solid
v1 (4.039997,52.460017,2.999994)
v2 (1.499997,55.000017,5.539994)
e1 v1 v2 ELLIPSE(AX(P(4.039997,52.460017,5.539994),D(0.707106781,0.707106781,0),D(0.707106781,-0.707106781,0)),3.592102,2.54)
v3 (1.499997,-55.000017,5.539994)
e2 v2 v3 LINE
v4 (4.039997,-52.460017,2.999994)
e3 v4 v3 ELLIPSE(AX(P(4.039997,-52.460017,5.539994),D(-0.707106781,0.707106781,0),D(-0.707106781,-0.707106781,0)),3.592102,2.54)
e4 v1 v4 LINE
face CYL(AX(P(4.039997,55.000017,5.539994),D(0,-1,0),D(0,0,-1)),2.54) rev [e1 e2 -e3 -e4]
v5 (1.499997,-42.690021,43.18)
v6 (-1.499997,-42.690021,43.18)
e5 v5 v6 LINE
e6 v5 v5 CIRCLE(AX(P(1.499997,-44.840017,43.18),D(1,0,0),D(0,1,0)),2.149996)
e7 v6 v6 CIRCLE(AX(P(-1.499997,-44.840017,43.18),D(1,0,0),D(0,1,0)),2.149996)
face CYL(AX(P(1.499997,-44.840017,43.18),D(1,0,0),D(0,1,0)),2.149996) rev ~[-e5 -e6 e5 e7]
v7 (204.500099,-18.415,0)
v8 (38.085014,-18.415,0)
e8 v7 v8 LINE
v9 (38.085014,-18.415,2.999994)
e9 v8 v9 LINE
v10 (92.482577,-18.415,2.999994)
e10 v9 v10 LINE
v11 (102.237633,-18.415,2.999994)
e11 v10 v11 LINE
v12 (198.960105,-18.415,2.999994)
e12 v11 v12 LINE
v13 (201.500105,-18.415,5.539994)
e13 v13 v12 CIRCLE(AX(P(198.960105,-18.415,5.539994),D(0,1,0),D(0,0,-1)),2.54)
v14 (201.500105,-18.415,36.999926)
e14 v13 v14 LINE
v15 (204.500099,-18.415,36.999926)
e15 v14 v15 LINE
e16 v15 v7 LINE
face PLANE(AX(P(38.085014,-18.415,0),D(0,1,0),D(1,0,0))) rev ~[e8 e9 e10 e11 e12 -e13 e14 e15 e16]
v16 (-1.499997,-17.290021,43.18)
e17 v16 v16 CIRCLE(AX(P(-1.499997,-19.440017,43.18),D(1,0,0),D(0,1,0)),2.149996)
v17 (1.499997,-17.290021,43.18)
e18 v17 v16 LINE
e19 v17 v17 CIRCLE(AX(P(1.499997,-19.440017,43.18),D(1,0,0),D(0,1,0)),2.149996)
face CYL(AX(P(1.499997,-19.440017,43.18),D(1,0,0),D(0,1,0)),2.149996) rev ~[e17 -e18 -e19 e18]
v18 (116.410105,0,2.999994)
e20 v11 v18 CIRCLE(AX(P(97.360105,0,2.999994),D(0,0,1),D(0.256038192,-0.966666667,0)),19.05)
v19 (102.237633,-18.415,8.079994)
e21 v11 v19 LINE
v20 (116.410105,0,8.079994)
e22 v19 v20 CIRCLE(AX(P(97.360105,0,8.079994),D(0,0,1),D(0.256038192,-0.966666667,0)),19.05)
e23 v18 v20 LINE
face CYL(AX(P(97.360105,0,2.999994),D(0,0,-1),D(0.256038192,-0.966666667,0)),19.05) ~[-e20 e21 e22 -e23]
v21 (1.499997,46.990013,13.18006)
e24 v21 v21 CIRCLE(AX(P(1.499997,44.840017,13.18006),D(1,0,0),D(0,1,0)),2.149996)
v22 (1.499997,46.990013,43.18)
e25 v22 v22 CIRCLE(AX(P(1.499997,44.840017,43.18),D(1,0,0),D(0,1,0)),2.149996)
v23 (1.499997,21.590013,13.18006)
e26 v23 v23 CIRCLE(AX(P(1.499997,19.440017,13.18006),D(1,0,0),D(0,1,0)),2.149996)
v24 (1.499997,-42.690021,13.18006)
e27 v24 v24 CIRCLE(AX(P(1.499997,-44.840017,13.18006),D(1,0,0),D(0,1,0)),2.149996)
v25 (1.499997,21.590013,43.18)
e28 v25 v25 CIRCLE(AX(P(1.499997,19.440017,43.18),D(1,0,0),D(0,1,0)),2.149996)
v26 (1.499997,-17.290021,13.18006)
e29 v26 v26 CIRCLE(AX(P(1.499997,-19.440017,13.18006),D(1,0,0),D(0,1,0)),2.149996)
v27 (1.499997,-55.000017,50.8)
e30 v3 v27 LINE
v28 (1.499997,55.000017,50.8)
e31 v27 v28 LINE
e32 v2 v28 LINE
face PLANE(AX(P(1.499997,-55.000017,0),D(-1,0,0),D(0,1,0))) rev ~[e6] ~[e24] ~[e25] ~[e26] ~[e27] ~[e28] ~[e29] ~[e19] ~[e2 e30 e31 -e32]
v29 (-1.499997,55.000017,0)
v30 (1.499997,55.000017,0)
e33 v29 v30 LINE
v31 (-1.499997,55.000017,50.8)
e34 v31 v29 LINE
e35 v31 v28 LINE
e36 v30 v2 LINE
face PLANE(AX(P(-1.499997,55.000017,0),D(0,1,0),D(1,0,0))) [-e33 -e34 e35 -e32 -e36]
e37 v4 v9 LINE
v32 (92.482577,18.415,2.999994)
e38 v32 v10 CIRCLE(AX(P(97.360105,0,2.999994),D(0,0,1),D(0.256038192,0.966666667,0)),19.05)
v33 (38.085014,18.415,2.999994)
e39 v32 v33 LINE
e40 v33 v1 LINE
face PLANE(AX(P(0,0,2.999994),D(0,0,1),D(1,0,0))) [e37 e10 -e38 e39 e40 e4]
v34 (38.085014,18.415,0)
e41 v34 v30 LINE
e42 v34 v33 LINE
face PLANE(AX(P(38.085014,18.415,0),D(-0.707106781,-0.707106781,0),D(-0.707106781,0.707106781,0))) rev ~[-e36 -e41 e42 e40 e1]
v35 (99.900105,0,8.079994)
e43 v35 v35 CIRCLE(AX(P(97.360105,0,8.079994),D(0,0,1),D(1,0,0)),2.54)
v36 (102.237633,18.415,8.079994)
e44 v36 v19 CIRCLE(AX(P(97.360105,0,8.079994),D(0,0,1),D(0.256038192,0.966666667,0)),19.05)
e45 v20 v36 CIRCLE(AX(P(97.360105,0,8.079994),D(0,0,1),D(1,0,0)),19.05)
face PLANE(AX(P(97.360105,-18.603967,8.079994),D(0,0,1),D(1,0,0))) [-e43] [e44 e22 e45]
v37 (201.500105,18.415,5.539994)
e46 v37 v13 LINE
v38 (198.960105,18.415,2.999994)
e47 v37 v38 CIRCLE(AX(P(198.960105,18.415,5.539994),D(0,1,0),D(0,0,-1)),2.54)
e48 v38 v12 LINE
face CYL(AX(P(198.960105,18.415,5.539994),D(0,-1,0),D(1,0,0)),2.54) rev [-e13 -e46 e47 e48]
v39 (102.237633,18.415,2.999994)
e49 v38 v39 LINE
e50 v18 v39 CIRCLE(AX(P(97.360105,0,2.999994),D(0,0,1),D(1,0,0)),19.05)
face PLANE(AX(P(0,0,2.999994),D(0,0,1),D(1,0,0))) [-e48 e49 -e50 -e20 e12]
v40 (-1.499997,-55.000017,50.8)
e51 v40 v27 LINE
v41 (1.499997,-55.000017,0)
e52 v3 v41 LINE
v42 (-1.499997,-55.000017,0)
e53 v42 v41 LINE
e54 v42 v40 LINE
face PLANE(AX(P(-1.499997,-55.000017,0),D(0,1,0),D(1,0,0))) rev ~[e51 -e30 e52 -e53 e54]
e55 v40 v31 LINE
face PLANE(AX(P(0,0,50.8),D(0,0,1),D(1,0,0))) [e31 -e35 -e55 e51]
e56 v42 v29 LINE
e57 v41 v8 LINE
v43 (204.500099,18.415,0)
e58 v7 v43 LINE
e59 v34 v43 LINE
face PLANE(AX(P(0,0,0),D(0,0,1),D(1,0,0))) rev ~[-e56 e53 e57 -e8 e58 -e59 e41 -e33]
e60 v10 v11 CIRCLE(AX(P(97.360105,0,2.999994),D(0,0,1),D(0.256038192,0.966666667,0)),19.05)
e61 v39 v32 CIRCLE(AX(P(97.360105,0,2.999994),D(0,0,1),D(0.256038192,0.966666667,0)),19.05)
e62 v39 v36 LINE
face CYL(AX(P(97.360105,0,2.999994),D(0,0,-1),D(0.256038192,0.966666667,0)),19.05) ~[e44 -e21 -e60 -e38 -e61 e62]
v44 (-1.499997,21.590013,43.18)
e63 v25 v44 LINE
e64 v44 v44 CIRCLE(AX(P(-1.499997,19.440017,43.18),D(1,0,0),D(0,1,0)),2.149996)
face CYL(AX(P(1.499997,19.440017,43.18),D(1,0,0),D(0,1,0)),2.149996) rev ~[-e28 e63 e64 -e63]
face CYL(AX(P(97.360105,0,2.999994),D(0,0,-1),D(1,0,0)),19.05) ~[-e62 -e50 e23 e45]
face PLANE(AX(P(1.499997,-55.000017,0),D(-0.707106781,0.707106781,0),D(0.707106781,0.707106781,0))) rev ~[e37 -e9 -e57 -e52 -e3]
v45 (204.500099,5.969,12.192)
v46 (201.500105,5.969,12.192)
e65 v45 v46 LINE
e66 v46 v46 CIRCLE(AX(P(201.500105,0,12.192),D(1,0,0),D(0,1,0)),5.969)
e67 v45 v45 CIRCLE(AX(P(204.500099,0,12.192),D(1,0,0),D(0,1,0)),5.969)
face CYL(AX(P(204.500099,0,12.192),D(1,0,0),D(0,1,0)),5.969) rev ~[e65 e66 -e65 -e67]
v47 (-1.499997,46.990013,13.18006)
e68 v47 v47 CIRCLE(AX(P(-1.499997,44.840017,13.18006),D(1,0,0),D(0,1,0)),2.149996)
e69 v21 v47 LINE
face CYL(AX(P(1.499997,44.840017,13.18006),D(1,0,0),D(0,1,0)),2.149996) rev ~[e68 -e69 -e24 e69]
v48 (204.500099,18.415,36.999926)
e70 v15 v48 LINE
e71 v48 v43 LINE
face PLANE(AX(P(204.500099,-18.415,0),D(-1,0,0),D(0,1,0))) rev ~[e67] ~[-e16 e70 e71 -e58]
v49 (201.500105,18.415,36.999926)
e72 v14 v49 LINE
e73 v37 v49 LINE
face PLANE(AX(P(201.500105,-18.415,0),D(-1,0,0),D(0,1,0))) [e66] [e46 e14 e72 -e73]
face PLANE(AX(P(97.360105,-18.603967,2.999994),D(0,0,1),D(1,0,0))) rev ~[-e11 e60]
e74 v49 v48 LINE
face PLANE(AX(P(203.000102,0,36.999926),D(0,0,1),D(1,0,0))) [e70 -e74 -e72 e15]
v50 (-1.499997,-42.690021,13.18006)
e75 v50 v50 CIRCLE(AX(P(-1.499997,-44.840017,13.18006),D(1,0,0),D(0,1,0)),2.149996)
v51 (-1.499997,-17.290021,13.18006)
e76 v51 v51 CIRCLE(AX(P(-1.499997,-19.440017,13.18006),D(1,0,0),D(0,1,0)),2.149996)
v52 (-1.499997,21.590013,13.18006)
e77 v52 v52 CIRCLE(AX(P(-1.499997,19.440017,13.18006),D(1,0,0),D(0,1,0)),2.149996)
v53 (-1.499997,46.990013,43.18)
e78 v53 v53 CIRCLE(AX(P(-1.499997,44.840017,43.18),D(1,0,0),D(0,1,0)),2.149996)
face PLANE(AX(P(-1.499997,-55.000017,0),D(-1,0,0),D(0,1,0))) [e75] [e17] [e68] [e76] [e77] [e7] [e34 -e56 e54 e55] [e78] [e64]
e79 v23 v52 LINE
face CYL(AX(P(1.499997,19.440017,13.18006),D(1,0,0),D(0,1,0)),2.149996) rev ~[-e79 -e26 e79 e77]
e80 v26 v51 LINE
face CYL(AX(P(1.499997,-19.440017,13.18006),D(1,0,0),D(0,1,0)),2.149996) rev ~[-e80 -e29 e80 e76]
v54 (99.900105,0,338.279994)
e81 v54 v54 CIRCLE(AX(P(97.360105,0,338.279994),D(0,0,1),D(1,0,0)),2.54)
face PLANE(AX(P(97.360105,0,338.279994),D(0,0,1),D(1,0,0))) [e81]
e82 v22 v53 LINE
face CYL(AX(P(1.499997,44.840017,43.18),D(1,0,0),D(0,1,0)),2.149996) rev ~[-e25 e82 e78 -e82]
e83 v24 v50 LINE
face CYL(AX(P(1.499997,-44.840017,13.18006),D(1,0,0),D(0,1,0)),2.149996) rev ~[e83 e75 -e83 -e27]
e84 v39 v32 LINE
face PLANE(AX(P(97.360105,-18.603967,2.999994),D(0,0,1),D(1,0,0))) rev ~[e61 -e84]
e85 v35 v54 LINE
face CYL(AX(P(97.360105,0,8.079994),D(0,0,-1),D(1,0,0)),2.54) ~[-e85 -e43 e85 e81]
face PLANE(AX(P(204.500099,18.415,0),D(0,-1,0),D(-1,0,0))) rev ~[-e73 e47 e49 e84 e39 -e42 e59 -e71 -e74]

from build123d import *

# Parameters (mm, degrees)
F0_W      = 2.999994
F0_H      = 110.000034
F0_H_2    = 36.83
F1_DEPTH  = 2.999994
F2_DEPTH  = 50.8
F3_DEPTH  = 36.999926
F4_R      = 2.1499957
F5_DEPTH  = 49.276
F6_R      = 5.969
F7_DEPTH  = 38.1
F8_R      = 2.54
F10_DEPTH = 5.08
F11_R     = 2.54
F12_DEPTH = 330.2
F13_R     = 2.54


with BuildPart() as f1:
    # F0 (on Top) → F1 (new body)
    with BuildSketch(Plane.XY):
        Rectangle(F0_W, F0_H)
        Polygon((38.085014, 18.415), (1.499997, 55.000017), (1.499997, -55.000017), (38.085014, -18.415), (201.500105, -18.415), (201.500105, 18.415), align=None)
        with Locations((203.000102, 0)):
            Rectangle(F0_W, F0_H_2)
    extrude(amount=F1_DEPTH)

    # F0 (on Top) → F2 (join)
    with BuildSketch(Plane.XY):
        Rectangle(F0_W, F0_H)
    extrude(amount=F2_DEPTH)

    # F0 (on Top) → F3 (join)
    with BuildSketch(Plane.XY):
        with Locations((203.000102, 0)):
            Rectangle(F0_W, F0_H_2)
    extrude(amount=F3_DEPTH)

    # F4 (on face) → F5 (cut)
    with BuildSketch(Plane.YZ.offset(1.499997)):
        with Locations((-44.840017, 43.18)):
            Circle(F4_R)
        with Locations((-44.840017, 13.18006)):
            Circle(F4_R)
        with Locations((-19.440017, 43.18)):
            Circle(F4_R)
        with Locations((-19.440017, 13.18006)):
            Circle(F4_R)
        with Locations((44.840017, 43.18)):
            Circle(F4_R)
        with Locations((19.440017, 43.18)):
            Circle(F4_R)
        with Locations((19.440017, 13.18006)):
            Circle(F4_R)
        with Locations((44.840017, 13.18006)):
            Circle(F4_R)
    extrude(amount=-F5_DEPTH, mode=Mode.SUBTRACT)

    # F6 (on face) → F7 (cut)
    with BuildSketch(Plane.YZ.offset(204.500099)):
        with Locations((0, 12.192)):
            Circle(F6_R)
    extrude(amount=-F7_DEPTH, mode=Mode.SUBTRACT)

    # F8
    f8_edges = [f1.edges().sort_by_distance(p)[0] for p in [
        (201.500105, 0, 2.999994),
    ]]
    fillet(f8_edges, radius=F8_R)

    # F9 (on face) → F10 (join)
    with BuildSketch(Plane.XY.offset(2.999994)):
        with BuildLine():
            ThreePointArc((92.4825774501, -18.415), (97.360105, -19.05), (102.2376325499, -18.415))
            Line((102.2376325499, -18.415), (92.4825774501, -18.415))
        make_face()
        with BuildLine():
            ThreePointArc((102.2376325499, -18.415), (112.4567834397, -11.6186401996), (116.410105, 0))
            ThreePointArc((116.410105, 0), (112.4567834397, 11.6186401996), (102.2376325499, 18.415))
            Line((102.2376325499, 18.415), (92.4825774501, 18.415))
            ThreePointArc((92.4825774501, 18.415), (78.310105, 0), (92.4825774501, -18.415))
            Line((92.4825774501, -18.415), (102.2376325499, -18.415))
        make_face()
        with BuildLine():
            Line((92.4825774501, 18.415), (102.2376325499, 18.415))
            ThreePointArc((102.2376325499, 18.415), (97.360105, 19.05), (92.4825774501, 18.415))
        make_face()
    extrude(amount=F10_DEPTH)

    # F11 (on face) → F12 (join)
    with BuildSketch(Plane.XY.offset(8.079994)):
        with Locations((97.360105, 0)):
            Circle(F11_R)
    extrude(amount=F12_DEPTH)

    # F13
    f13_edges = [f1.edges().sort_by_distance(p)[0] for p in [
        (1.499997, 0, 2.999994),
    ]]
    fillet(f13_edges, radius=F13_R)


solid = f1.part
